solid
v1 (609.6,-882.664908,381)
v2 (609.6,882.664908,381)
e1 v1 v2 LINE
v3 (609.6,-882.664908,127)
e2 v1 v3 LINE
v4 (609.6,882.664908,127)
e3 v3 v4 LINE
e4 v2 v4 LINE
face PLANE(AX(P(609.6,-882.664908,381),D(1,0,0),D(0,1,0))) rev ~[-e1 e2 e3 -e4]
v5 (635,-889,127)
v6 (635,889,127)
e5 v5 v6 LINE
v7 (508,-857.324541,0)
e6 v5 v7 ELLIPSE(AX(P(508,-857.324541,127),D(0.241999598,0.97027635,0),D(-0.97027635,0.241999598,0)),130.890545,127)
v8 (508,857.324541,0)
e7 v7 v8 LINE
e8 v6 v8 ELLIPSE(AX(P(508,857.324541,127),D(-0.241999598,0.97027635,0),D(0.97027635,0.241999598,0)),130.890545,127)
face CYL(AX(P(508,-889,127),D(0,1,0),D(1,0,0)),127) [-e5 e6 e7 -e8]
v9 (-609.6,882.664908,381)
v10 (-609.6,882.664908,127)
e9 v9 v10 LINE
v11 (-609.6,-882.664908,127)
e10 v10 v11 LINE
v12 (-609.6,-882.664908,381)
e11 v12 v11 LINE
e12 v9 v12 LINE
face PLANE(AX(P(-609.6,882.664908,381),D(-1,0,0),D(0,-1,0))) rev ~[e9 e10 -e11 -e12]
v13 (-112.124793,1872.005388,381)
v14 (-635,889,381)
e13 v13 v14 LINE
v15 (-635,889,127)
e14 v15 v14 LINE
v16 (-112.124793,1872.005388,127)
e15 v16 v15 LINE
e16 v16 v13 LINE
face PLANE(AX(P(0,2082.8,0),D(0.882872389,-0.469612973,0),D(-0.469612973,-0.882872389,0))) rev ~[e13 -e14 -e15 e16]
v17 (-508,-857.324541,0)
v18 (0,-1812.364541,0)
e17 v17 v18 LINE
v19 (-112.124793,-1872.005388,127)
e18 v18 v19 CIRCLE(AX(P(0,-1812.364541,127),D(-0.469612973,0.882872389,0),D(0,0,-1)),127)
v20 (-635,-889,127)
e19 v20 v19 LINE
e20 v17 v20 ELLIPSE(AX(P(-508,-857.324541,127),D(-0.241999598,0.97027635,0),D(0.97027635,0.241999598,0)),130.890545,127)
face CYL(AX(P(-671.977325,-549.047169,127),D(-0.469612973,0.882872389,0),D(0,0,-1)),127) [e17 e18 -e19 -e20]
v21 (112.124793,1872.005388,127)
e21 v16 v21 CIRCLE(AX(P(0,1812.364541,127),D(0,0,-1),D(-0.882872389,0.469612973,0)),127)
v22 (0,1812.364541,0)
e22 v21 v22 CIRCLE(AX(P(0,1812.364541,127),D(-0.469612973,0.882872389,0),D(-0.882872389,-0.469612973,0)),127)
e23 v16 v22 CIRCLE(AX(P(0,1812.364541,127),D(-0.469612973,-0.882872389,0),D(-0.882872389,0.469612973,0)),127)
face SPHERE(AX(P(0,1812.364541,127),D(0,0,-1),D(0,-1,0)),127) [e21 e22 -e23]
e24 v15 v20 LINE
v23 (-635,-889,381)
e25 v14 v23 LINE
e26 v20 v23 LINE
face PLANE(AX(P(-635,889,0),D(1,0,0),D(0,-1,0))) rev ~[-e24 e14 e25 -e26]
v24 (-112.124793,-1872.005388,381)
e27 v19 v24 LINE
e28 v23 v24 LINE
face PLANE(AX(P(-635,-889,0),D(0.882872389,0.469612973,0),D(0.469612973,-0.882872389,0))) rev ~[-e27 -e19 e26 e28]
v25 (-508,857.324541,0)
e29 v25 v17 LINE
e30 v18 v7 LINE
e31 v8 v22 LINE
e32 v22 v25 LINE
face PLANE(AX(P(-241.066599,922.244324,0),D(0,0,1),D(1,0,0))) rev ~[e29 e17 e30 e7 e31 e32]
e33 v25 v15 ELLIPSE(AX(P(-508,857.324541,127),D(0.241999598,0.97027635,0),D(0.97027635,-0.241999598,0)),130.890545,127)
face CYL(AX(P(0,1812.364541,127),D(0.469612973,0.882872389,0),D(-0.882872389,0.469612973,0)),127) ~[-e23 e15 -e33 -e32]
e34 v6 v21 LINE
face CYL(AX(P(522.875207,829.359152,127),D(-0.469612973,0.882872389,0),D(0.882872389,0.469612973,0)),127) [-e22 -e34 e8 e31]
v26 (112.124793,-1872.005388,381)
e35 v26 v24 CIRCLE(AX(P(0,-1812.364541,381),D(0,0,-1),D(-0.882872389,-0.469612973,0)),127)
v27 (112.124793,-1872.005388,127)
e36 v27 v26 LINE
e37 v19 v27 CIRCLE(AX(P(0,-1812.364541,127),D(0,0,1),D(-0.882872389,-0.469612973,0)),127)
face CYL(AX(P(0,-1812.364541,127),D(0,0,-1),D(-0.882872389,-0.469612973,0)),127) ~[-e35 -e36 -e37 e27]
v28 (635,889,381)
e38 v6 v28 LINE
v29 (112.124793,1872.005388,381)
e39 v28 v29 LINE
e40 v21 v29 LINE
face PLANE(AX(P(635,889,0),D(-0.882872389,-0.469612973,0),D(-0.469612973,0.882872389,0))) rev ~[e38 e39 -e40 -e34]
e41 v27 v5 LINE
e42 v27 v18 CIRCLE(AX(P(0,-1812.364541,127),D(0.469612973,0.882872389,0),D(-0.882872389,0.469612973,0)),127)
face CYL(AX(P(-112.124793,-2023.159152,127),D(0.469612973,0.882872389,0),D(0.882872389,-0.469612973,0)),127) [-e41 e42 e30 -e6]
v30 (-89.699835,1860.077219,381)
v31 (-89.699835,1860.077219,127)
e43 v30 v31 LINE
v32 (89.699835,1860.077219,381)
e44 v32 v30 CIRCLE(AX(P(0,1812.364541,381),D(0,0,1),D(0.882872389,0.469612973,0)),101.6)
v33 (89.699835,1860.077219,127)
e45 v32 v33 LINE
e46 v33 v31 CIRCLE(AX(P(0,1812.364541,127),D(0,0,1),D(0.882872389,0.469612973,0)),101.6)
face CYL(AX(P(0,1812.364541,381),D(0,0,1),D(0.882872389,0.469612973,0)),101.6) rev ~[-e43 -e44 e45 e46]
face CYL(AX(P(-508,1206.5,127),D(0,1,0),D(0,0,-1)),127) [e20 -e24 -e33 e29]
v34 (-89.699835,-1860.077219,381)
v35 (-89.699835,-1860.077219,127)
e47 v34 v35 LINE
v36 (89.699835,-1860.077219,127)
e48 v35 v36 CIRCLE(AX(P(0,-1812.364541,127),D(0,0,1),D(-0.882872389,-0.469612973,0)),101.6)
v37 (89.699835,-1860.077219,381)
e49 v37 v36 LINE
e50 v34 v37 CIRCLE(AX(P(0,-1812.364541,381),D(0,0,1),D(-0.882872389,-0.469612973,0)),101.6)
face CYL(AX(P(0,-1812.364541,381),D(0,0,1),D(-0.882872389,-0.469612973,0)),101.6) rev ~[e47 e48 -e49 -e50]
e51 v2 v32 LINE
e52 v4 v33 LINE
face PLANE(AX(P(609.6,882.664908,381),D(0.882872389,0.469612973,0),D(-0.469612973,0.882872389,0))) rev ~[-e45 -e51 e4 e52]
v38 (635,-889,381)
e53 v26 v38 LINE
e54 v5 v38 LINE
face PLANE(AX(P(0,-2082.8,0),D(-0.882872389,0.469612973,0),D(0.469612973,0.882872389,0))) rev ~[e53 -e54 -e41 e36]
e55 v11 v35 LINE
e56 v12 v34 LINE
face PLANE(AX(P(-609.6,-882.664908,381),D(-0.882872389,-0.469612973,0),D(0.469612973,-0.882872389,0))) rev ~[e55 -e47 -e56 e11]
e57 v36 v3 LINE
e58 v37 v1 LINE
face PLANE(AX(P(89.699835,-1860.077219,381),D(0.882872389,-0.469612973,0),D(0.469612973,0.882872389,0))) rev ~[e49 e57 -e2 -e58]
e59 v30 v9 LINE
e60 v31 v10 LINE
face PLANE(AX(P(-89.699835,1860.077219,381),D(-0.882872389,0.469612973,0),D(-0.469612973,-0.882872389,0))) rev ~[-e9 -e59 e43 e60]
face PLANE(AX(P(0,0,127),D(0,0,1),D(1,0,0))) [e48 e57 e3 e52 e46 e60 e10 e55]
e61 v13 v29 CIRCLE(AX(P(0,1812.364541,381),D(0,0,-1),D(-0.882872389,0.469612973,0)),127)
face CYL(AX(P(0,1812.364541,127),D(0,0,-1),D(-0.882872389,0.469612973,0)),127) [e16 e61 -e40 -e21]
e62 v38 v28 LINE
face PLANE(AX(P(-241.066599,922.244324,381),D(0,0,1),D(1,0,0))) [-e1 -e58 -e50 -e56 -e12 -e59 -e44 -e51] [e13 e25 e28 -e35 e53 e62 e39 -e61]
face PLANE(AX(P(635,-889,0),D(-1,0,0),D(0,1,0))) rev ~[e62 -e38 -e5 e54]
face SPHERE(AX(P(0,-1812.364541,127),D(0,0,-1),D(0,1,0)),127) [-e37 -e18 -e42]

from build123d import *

# Parameters (mm, degrees)
F1_DEPTH     = 381
F2_R         = 127
F3_T1_DEPTH  = 1430.9172960673
F3_T3_DEPTH  = 2413
F3_T5_DEPTH  = 1430.9172960673
F3_T7_DEPTH  = 850.9
F3_T12_DEPTH = 127
F3_T18_DEPTH = 127
F5_DEPTH     = 254


# Not quite as in the source:
# - a fillet or chamfer that OpenCascade refuses, or shapes differently, is made with other operations: its cross-section is extruded or revolved along the edge and cut away or added


with BuildPart() as f1:
    # F0 (on Top) → F1 (new body)
    with BuildSketch(Plane.XY):
        Polygon((-635, 0), (0, 0), (0, 2082.8), (-635, 889), align=None)
        Polygon((635, 0), (0, 0), (-635, 0), (-635, -889), (0, -2082.8), (635, -889), align=None)
        Polygon((0, 2082.8), (0, 0), (635, 0), (635, 889), align=None)
    extrude(amount=F1_DEPTH)

    # F2
    f2_edges = [f1.edges().sort_by_distance(p)[0] for p in [
        (635, 0, 0),
        (317.5, -1485.9, 0),
        (317.5, 1485.9, 0),
    ]]
    fillet(f2_edges, radius=F2_R)

    # F3: fillet of radius 127 on 3 edges, made by hand

    # F3_s2 → F3_t1 (cut)
    with BuildSketch(Plane(origin=(751.4214309895, 1412.6722902602, 0), x_dir=(0, 0, 1), z_dir=(-0.469612973, -0.8828723892, 0))):
        with BuildLine():
            ThreePointArc((127, 978.1099001193), (37.1974387893, 940.91246133), (0, 851.1099001193))
            Line((0, 851.1099001193), (0, 978.1099001193))
            Line((0, 978.1099001193), (127, 978.1099001193))
        make_face()
    extrude(amount=F3_T1_DEPTH, mode=Mode.SUBTRACT)

    # F3_s4 → F3_t3 (cut)
    with BuildSketch(Plane.XZ.offset(-1206.5)):
        with BuildLine():
            ThreePointArc((-508, 0), (-597.8025612107, 37.1974387893), (-635, 127))
            Line((-635, 127), (-635, 0))
            Line((-635, 0), (-508, 0))
        make_face()
    extrude(amount=F3_T3_DEPTH, mode=Mode.SUBTRACT)

    # F3_s6 → F3_t5 (cut)
    with BuildSketch(Plane(origin=(79.4441054972, -149.3549183347, 0), x_dir=(0, 0, 1), z_dir=(0.469612973, -0.8828723892, 0))):
        with BuildLine():
            ThreePointArc((0, 851.1099001193), (37.1974387893, 940.91246133), (127, 978.1099001193))
            Line((127, 978.1099001193), (0, 978.1099001193))
            Line((0, 978.1099001193), (0, 851.1099001193))
        make_face()
    extrude(amount=F3_T5_DEPTH, mode=Mode.SUBTRACT)

    # F3_s8 → F3_t7 (cut)
    with BuildSketch(Plane.XY.offset(127)):
        with BuildLine():
            ThreePointArc((-112.1247934283, -1872.0053883548), (0, -1939.3645407865), (112.1247934283, -1872.0053883548))
            Line((112.1247934283, -1872.0053883548), (0, -2082.8))
            Line((0, -2082.8), (-112.1247934283, -1872.0053883548))
        make_face()
        with BuildLine():
            ThreePointArc((-112.1247934283, 1872.0053883548), (0, 1939.3645407865), (112.1247934283, 1872.0053883548))
            Line((112.1247934283, 1872.0053883548), (0, 2082.8))
            Line((0, 2082.8), (-112.1247934283, 1872.0053883548))
        make_face()
    extrude(amount=F3_T7_DEPTH, mode=Mode.SUBTRACT)


with BuildPart() as f3_tool10:
    # F3_s11 → F3_t12 (new body)
    with BuildSketch(Plane.XY.offset(127)):
        Polygon((0, -1812.3645407865), (-112.1247934283, -1872.0053883548), (0, -2082.8), (112.1247934283, -1872.0053883548), align=None)
    extrude(amount=-F3_T12_DEPTH)

    # F3_s13 → F3_t14 (revolve, cut)
    with BuildSketch(Plane(origin=(0, -1812.3645407865, 127), x_dir=(0, 1, 0), z_dir=(-1, 0, 0))):
        with BuildLine():
            ThreePointArc((0, -127), (127, 0), (0, 127))
            Line((0, 127), (0, -127))
        make_face()
    revolve(axis=Axis((0, -1812.3645407865, 127), (0, 0, -1)), mode=Mode.SUBTRACT)


with BuildPart() as f1_1:
    add(f1.part)

    # F3_t9: cut F3_tool10
    add(f3_tool10.part, mode=Mode.SUBTRACT)


with BuildPart() as f3_tool16:
    # F3_s17 → F3_t18 (new body)
    with BuildSketch(Plane.XY.offset(127)):
        Polygon((0, 1812.3645407865), (-112.1247934283, 1872.0053883548), (0, 2082.8), (112.1247934283, 1872.0053883548), align=None)
    extrude(amount=-F3_T18_DEPTH)

    # F3_s19 → F3_t20 (revolve, cut)
    with BuildSketch(Plane(origin=(0, 1812.3645407865, 127), x_dir=(0, -1, 0), z_dir=(1, 0, 0))):
        with BuildLine():
            ThreePointArc((0, -127), (127, 0), (0, 127))
            Line((0, 127), (0, -127))
        make_face()
    revolve(axis=Axis((0, 1812.3645407865, 127), (0, 0, -1)), mode=Mode.SUBTRACT)


with BuildPart() as f1_2:
    add(f1_1.part)

    # F3_t15: cut F3_tool16
    add(f3_tool16.part, mode=Mode.SUBTRACT)

    # F4 (on face) → F5 (cut)
    with BuildSketch(Plane.XY.offset(381)):
        with BuildLine():
            Line((-609.6, -882.6649081573), (-89.6998347426, -1860.0772188411))
            ThreePointArc((-89.6998347426, -1860.0772188411), (0, -1913.9645407865), (89.6998347426, -1860.0772188411))
            Line((89.6998347426, -1860.0772188411), (609.6, -882.6649081573))
            Line((609.6, -882.6649081573), (609.6, 882.6649081573))
            Line((609.6, 882.6649081573), (89.6998347426, 1860.0772188411))
            ThreePointArc((89.6998347426, 1860.0772188411), (0, 1913.9645407865), (-89.6998347426, 1860.0772188411))
            Line((-89.6998347426, 1860.0772188411), (-609.6, 882.6649081573))
            Line((-609.6, 882.6649081573), (-609.6, -882.6649081573))
        make_face()
    extrude(amount=-F5_DEPTH, mode=Mode.SUBTRACT)


solid = f1_2.part
